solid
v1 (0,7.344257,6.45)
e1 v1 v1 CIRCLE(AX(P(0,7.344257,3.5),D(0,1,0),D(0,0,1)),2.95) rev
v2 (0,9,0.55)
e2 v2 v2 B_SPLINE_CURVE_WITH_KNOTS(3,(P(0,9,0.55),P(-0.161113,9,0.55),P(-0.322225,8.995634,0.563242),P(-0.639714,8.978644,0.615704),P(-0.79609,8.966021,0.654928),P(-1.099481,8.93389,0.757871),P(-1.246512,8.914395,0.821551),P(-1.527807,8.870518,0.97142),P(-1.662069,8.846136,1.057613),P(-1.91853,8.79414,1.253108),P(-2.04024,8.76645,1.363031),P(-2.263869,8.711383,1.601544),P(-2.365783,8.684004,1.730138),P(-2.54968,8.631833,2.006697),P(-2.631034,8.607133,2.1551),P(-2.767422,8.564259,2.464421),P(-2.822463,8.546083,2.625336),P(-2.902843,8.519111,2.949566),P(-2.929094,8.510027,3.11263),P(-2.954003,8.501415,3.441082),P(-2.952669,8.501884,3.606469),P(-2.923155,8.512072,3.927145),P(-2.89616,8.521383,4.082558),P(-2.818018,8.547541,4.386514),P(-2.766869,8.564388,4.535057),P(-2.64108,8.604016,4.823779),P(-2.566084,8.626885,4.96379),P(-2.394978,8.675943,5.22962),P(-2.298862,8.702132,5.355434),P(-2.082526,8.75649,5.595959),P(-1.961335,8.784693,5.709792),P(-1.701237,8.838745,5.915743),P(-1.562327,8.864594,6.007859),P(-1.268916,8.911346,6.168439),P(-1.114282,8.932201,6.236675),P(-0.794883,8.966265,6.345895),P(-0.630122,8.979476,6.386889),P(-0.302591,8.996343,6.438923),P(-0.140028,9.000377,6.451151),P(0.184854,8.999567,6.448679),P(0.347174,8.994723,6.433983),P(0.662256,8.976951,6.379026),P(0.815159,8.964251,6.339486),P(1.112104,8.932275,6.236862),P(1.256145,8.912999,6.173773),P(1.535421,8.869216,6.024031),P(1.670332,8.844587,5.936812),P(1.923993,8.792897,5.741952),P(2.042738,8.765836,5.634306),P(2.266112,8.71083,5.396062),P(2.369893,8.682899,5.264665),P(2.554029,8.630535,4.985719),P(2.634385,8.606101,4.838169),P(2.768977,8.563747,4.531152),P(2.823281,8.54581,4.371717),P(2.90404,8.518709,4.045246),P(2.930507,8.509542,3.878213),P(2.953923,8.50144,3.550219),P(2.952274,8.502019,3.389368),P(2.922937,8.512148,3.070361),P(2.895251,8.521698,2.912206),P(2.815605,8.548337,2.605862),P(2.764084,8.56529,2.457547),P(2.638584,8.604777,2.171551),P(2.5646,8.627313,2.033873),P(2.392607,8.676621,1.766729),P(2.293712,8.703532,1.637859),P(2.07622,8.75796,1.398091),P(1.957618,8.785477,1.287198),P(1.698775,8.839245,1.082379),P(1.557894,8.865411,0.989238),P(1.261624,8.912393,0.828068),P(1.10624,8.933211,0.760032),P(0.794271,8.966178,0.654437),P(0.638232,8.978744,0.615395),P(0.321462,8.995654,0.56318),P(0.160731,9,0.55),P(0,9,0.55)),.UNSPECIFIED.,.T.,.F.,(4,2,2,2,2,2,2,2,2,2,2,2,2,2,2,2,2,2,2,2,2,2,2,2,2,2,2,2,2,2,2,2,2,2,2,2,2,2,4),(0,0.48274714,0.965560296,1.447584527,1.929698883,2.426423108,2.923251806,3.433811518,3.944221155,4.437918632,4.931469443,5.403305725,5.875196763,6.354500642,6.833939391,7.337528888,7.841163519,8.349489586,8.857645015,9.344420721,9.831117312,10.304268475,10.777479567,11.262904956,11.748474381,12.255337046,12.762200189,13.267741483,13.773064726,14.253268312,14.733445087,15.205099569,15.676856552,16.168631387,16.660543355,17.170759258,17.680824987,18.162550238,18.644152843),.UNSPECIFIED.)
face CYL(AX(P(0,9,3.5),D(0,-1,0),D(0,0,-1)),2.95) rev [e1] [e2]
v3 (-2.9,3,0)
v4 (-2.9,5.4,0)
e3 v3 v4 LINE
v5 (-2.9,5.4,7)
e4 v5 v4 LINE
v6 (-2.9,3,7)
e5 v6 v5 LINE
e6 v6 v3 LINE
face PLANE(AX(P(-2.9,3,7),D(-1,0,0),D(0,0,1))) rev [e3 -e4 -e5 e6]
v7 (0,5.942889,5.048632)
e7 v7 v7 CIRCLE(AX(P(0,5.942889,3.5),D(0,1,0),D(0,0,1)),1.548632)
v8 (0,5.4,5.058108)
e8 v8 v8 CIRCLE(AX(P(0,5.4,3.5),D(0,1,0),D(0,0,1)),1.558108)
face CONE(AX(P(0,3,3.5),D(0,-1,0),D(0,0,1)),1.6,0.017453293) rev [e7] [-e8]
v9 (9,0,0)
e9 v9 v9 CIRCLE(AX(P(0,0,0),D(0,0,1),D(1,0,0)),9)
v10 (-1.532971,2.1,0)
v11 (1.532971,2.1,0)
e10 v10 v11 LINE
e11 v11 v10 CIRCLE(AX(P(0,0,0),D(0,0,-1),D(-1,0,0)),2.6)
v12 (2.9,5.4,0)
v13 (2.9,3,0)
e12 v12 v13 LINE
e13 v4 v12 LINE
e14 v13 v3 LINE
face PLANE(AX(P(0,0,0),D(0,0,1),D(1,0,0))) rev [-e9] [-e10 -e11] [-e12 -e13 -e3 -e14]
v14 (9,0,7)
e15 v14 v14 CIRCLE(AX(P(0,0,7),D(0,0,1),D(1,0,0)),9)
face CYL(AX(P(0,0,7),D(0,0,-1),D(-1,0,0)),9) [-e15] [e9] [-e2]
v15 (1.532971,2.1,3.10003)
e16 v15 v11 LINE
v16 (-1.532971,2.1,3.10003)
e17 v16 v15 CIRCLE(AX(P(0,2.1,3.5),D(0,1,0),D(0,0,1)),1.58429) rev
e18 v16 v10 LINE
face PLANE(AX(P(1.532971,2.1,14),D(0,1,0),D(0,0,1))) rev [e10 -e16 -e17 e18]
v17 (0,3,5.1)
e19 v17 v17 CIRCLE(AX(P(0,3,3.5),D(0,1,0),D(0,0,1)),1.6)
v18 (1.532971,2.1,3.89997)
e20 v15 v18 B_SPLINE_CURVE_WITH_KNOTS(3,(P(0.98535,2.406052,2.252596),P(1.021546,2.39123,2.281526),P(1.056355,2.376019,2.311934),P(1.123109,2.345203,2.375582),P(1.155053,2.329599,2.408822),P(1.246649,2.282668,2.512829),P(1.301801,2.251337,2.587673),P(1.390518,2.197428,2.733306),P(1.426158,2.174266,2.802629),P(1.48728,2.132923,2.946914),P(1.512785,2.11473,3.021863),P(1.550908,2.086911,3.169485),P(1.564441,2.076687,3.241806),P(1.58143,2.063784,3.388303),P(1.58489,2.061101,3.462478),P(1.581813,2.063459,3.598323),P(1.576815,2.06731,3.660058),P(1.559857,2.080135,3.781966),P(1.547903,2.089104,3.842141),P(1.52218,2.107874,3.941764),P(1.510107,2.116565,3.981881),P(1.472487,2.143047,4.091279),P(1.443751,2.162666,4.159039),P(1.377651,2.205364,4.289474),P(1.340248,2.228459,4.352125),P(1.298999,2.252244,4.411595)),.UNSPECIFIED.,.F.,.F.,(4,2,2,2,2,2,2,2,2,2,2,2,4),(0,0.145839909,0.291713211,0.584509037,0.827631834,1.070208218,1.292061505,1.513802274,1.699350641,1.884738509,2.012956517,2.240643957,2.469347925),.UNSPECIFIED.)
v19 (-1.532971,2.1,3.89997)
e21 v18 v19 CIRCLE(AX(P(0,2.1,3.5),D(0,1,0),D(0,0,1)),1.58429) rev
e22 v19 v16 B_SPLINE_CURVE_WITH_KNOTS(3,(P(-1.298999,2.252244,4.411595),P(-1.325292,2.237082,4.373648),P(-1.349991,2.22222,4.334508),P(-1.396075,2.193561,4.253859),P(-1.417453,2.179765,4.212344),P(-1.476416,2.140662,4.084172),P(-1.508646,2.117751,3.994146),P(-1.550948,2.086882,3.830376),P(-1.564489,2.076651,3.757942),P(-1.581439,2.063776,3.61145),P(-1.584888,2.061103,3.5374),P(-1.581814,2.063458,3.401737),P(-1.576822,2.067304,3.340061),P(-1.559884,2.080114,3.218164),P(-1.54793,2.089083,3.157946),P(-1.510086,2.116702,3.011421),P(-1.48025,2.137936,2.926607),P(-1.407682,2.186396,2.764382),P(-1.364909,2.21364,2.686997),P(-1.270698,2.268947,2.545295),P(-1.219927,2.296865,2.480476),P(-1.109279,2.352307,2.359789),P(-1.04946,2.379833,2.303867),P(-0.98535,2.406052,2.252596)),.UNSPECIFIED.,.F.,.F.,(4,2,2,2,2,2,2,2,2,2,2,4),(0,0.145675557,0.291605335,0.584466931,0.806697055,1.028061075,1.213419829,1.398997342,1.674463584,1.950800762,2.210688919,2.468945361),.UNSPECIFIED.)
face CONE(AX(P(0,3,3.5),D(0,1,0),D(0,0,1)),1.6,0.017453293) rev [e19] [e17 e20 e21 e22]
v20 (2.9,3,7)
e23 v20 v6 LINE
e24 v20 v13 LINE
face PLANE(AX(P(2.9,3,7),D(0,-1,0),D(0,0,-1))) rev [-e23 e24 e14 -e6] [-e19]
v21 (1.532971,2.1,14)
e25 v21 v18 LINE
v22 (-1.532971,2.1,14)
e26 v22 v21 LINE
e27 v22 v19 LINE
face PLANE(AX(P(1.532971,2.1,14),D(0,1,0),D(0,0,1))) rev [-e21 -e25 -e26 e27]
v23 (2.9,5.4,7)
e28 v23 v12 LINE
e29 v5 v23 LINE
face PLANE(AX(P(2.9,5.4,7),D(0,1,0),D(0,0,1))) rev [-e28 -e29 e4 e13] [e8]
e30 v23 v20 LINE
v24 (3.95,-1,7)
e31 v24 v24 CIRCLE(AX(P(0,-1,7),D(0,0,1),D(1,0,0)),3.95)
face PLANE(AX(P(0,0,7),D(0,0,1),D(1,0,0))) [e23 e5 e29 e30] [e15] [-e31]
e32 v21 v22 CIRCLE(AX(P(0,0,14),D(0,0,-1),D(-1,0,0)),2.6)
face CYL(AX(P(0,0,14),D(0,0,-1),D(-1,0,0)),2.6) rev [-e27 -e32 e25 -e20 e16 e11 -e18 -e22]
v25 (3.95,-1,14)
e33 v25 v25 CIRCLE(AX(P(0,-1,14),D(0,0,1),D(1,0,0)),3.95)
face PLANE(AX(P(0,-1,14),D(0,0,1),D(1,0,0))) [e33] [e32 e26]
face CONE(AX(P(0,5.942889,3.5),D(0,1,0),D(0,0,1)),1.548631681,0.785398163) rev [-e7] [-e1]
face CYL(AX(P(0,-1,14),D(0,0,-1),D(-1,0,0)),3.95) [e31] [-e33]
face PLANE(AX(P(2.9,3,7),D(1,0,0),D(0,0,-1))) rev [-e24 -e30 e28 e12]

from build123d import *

# Parameters (mm, degrees)
ESQUISSE1_R             = 9
BOSS_EXTRU_1_DEPTH      = 7
ESQUISSE2_W             = 5.8
ESQUISSE2_H             = 2.4
ENL_V_MAT_EXTRU_1_DEPTH = 15.525839046
ESQUISSE7_R             = 2.95
ENL_V_MAT_EXTRU_8_DEPTH = 21.802884576
CHANFREIN1_SIZE         = 2.5
CHANFREIN1_SIZE_2       = 2.457485256
ESQUISSE9_R             = 3.95
BOSS_EXTRU_2_DEPTH      = 7
ENL_V_MAT_EXTRU_9_DEPTH = 19.92088803


# Read off the part's stored shape, not the designer's step: Enlèv. mat.-Extru.2
with BuildPart() as part:
    # Esquisse1 → Boss.-Extru.1 (new body)
    with BuildSketch(Plane.XY):
        Circle(ESQUISSE1_R)
    extrude(amount=BOSS_EXTRU_1_DEPTH)

    # Esquisse2 → Enlèv. mat.-Extru.1 (cut, through all)
    with BuildSketch(Plane(origin=(0, 0, 0), x_dir=(-1, 0, 0), z_dir=(0, 0, -1))):
        with Locations((0, 4.2)):
            Rectangle(ESQUISSE2_W, ESQUISSE2_H)
    extrude(amount=-ENL_V_MAT_EXTRU_1_DEPTH, mode=Mode.SUBTRACT)

    # Enlèv. mat.-Extru.2 outline → Enlèv. mat.-Extru.2 (revolve, cut)
    with BuildSketch(Plane.XY.offset(3.5)):
        Polygon((0, 5.4), (1.558107844, 5.4), (1.49526864, 9.000055608), (0, 9.000055608), align=None)
        Polygon((1.6, 3), (0, 3), (0, 1), (1.56508987, 1), align=None)
    revolve(axis=Axis((0, 0, 3.5), (0, 1, 0)), mode=Mode.SUBTRACT)

    # Esquisse7 → Enlèv. mat.-Extru.8 (cut, through all)
    with BuildSketch(Plane(origin=(0, 8.4, 0), x_dir=(1, 0, 0), z_dir=(0, 1, 0))):
        with Locations(Location((0, -3.5, 0), (0, 0, 90))):
            Circle(ESQUISSE7_R)
    extrude(amount=ENL_V_MAT_EXTRU_8_DEPTH, mode=Mode.SUBTRACT)

    # Chanfrein1
    # the kernel refuses this chamfer: 2.5, 2.457485256 mm, written as the material it takes off along each edge
    with BuildSketch(Plane(origin=(0, 8.4, 3.5), x_dir=(1, 0, 0), z_dir=(0, 0, 1))) as chanfrein1_piece_1_section:
        Polygon((1.50574265 + CHANFREIN1_SIZE, 0), (1.50574265 + CHANFREIN1_SIZE_2 * 0.0174524063286, -CHANFREIN1_SIZE_2 * 0.999847695023), (1.50574265, 0), align=None)
    chanfrein1_piece_1 = revolve(axis=Axis((0, 8.4, 3.5), (0, 1, 0)), mode=Mode.PRIVATE)
    chanfrein1_piece_1 = chanfrein1_piece_1 & Plane(origin=(0, 6.666447792, 3.5), x_dir=(0, 0, -1), z_dir=(0, -1, 0)) * Cylinder(2.95, 17, mode=Mode.PRIVATE)
    add(chanfrein1_piece_1, mode=Mode.SUBTRACT)

    # Esquisse9 → Boss.-Extru.2 (add)
    with BuildSketch(Plane.XY.offset(7)):
        with Locations((0, -1)):
            Circle(ESQUISSE9_R)
    extrude(amount=BOSS_EXTRU_2_DEPTH)

    # Esquisse10 → Enlèv. mat.-Extru.9 (cut, through all)
    with BuildSketch(Plane(origin=(0, 0, 0), x_dir=(-1, 0, 0), z_dir=(0, 0, -1))):
        with BuildLine():
            Line((-1.532970972, 2.1), (1.532970972, 2.1))
            ThreePointArc((1.532970972, 2.1), (0, -2.6), (-1.532970972, 2.1))
        make_face()
    extrude(amount=-ENL_V_MAT_EXTRU_9_DEPTH, mode=Mode.SUBTRACT)


solid = part.part
